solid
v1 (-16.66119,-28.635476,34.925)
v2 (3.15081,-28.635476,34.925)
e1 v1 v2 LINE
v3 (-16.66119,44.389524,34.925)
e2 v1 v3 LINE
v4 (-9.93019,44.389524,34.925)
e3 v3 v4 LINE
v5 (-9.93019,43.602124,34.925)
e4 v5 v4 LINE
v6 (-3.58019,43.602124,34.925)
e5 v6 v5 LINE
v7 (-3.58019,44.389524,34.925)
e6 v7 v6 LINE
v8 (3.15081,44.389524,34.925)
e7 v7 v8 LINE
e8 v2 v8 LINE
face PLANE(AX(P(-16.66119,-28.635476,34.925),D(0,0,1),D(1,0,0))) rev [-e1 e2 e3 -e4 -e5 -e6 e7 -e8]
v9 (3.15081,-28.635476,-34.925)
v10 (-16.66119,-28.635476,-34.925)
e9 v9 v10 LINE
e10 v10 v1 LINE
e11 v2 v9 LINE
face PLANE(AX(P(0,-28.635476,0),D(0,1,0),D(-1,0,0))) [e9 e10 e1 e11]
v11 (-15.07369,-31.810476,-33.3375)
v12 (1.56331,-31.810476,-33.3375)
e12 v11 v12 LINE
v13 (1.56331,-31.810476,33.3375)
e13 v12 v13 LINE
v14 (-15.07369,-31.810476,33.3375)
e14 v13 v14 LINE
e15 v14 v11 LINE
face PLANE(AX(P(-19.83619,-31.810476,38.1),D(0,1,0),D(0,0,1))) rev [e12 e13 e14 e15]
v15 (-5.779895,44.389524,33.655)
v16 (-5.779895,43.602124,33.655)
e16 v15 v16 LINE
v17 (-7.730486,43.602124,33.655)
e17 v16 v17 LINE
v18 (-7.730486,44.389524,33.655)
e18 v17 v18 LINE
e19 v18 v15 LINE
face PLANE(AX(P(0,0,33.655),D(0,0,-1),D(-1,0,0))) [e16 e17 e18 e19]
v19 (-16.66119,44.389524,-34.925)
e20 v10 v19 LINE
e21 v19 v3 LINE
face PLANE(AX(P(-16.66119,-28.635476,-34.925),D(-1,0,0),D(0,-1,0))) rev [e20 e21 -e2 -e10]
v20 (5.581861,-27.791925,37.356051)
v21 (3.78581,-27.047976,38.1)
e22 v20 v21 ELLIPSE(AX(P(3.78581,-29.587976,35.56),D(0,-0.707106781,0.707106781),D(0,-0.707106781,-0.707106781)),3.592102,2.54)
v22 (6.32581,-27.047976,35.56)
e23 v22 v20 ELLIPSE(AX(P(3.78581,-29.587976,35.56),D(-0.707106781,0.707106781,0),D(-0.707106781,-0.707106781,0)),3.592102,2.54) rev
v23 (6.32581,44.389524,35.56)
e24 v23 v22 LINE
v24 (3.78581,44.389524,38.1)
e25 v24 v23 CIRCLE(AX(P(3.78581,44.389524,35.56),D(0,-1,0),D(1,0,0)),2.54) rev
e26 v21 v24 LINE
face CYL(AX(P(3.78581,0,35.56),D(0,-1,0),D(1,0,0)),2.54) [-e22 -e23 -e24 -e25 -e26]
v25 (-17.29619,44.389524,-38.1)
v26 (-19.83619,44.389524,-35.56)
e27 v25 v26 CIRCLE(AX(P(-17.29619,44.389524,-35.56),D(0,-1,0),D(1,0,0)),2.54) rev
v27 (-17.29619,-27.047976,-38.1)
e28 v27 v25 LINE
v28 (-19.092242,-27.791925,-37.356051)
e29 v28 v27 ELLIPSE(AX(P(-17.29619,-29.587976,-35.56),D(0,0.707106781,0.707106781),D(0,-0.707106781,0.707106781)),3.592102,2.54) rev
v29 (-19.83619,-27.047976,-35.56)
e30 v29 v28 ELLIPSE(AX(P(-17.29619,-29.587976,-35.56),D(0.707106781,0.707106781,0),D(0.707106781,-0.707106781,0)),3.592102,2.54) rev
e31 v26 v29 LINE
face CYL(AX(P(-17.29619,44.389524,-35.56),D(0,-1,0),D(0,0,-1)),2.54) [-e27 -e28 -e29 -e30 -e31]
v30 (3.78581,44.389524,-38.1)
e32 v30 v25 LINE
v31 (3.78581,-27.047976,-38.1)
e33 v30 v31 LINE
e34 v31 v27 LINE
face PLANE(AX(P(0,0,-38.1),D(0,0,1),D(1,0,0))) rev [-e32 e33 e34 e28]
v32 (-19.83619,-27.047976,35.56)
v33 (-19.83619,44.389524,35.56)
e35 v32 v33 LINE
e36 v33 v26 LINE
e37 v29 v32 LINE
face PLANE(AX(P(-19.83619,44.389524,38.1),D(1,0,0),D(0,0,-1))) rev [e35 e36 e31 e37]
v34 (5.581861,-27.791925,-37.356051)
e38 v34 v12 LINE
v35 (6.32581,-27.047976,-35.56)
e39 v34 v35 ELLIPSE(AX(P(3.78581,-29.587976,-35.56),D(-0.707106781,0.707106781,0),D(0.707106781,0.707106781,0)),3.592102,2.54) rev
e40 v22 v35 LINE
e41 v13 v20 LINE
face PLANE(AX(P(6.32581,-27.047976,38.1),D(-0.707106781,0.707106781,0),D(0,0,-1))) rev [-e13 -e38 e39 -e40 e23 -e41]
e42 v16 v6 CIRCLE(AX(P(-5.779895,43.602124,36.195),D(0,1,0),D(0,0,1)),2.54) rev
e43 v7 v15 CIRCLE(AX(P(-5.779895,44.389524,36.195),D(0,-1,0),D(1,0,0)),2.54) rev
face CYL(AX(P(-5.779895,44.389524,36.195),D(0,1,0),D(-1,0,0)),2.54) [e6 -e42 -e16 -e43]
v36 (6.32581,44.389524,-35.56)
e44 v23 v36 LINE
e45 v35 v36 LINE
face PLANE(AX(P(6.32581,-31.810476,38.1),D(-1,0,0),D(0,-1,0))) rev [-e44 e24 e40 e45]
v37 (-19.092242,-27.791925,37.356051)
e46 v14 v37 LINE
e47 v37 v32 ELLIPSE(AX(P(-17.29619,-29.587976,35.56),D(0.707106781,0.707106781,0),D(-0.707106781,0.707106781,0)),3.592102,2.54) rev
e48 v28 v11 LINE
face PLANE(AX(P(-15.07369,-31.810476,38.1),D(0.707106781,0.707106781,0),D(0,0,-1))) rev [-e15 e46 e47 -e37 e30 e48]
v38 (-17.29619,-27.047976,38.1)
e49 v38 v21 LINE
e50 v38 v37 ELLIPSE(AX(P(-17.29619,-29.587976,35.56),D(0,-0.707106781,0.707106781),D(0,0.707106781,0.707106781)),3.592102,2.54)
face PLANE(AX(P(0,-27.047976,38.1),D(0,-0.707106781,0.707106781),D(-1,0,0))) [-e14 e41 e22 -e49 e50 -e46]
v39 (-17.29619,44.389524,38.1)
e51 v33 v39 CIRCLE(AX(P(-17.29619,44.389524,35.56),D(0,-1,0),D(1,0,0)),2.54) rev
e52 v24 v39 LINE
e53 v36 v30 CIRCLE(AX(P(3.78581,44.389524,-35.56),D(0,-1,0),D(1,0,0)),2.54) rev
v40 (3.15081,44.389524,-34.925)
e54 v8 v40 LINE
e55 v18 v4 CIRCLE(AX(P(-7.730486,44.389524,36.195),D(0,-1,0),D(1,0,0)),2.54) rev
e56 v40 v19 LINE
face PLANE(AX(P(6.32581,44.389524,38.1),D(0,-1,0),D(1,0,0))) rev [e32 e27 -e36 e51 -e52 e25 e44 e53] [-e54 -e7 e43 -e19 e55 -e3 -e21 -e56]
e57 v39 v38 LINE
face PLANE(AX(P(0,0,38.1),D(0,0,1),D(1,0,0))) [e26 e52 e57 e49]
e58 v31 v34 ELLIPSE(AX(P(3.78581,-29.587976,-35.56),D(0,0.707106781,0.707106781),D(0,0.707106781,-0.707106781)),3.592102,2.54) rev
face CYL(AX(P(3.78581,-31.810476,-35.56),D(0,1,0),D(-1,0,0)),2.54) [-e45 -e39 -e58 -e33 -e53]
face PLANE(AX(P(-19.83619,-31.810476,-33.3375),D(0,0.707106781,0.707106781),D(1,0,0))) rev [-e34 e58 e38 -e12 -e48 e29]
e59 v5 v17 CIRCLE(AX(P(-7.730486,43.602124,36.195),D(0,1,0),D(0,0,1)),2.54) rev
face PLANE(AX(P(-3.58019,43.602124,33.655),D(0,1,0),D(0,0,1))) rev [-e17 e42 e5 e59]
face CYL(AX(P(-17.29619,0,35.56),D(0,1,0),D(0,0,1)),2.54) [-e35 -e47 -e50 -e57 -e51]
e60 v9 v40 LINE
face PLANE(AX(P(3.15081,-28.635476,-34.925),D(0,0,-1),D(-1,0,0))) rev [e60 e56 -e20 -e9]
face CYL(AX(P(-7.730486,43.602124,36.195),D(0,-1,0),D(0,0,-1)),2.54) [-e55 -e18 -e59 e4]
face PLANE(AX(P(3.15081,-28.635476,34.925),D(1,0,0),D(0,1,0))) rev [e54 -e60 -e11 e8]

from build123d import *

# Parameters (mm, degrees)
SKETCH1_W           = 26.162
SKETCH1_H           = 76.2
BOSS_EXTRUDE1_DEPTH = 38.1
SKETCH2_W           = 19.812
SKETCH2_H           = 69.85
CUT_EXTRUDE1_DEPTH  = 73.025
CHAMFER1_SIZE       = 4.7625
SKETCH3_W           = 6.35
SKETCH3_H           = 0.7874
BOSS_EXTRUDE2_DEPTH = 1.27
FILLET1_R           = 2.54
FILLET2_R           = 2.54


with BuildPart() as part:
    # Sketch1 → Boss-Extrude1 (new, symmetric)
    with BuildSketch(Plane.XY):
        with Locations((-6.755190476, 6.28952381)):
            Rectangle(SKETCH1_W, SKETCH1_H)
    extrude(amount=BOSS_EXTRUDE1_DEPTH, both=True)

    # Sketch2 → Cut-Extrude1 (cut)
    with BuildSketch(Plane(origin=(0, 44.38952381, 0), x_dir=(1, 0, 0), z_dir=(0, 1, 0))):
        with Locations((-6.755190476, 0)):
            Rectangle(SKETCH2_W, SKETCH2_H)
    extrude(amount=-CUT_EXTRUDE1_DEPTH, mode=Mode.SUBTRACT)

    # Chamfer1
    chamfer1_edges = [part.edges().sort_by_distance(p)[0] for p in [
        (-6.755190476, -31.81047619, 38.1),
        (-6.755190476, -31.81047619, -38.1),
        (6.325809524, -31.81047619, 0),
        (-19.836190476, -31.81047619, 0),
    ]]
    chamfer(chamfer1_edges, length=CHAMFER1_SIZE)

    # Sketch3 → Boss-Extrude2 (add)
    with BuildSketch(Plane(origin=(0, 0, 34.925), x_dir=(-1, 0, 0), z_dir=(0, 0, -1))):
        with Locations((6.755190476, 43.99582381)):
            Rectangle(SKETCH3_W, SKETCH3_H)
    extrude(amount=BOSS_EXTRUDE2_DEPTH)

    # Fillet1
    fillet1_edges = [part.edges().sort_by_distance(p)[0] for p in [
        (6.325809524, 8.67077381, -38.1),
        (6.325809524, 8.67077381, 38.1),
        (-19.836190476, 8.67077381, -38.1),
        (-19.836190476, 8.67077381, 38.1),
    ]]
    fillet(fillet1_edges, radius=FILLET1_R)

    # Fillet2
    # the kernel refuses this fillet: 2.54 mm, written as the material it takes off along each edge
    with BuildSketch(Plane(origin=(-3.580190476, 49.888785124, 33.655), x_dir=(0, 0, 1), z_dir=(0, -1, 0))) as fillet2_piece_1:
        with BuildLine():
            CenterArc((2.54, 2.199704526), FILLET2_R, 180, 60)
            Line((0, 2.199704526), (-0.0508, 2.199704526))
            Line((-0.0508, 2.199704526), (-0.0508, 0))
            Line((-0.0508, 0), (0, -0.0508))
            ThreePointArc((0, -0.0508), (0.635, -0.0508), (1.2446, -0.043994091))
            Line((1.2446, -0.043994091), (1.27, 0))
        make_face()
    extrude(amount=11.785922628, mode=Mode.SUBTRACT)
    with BuildSketch(Plane(origin=(-9.930190476, 38.102862495, 33.655), x_dir=(1, 0, 0), z_dir=(0, 1, 0))) as fillet2_piece_2:
        with BuildLine():
            CenterArc((2.199704526, -2.54), FILLET2_R, 90, 60)
            Line((0, -1.27), (-0.043994091, -1.2446))
            ThreePointArc((-0.043994091, -1.2446), (-0.0508, -0.635), (-0.0508, 0))
            Line((-0.0508, 0), (0, 0.0508))
            Line((0, 0.0508), (2.199704526, 0.0508))
            Line((2.199704526, 0.0508), (2.199704526, 0))
        make_face()
    extrude(amount=11.785922628, mode=Mode.SUBTRACT)


solid = part.part
